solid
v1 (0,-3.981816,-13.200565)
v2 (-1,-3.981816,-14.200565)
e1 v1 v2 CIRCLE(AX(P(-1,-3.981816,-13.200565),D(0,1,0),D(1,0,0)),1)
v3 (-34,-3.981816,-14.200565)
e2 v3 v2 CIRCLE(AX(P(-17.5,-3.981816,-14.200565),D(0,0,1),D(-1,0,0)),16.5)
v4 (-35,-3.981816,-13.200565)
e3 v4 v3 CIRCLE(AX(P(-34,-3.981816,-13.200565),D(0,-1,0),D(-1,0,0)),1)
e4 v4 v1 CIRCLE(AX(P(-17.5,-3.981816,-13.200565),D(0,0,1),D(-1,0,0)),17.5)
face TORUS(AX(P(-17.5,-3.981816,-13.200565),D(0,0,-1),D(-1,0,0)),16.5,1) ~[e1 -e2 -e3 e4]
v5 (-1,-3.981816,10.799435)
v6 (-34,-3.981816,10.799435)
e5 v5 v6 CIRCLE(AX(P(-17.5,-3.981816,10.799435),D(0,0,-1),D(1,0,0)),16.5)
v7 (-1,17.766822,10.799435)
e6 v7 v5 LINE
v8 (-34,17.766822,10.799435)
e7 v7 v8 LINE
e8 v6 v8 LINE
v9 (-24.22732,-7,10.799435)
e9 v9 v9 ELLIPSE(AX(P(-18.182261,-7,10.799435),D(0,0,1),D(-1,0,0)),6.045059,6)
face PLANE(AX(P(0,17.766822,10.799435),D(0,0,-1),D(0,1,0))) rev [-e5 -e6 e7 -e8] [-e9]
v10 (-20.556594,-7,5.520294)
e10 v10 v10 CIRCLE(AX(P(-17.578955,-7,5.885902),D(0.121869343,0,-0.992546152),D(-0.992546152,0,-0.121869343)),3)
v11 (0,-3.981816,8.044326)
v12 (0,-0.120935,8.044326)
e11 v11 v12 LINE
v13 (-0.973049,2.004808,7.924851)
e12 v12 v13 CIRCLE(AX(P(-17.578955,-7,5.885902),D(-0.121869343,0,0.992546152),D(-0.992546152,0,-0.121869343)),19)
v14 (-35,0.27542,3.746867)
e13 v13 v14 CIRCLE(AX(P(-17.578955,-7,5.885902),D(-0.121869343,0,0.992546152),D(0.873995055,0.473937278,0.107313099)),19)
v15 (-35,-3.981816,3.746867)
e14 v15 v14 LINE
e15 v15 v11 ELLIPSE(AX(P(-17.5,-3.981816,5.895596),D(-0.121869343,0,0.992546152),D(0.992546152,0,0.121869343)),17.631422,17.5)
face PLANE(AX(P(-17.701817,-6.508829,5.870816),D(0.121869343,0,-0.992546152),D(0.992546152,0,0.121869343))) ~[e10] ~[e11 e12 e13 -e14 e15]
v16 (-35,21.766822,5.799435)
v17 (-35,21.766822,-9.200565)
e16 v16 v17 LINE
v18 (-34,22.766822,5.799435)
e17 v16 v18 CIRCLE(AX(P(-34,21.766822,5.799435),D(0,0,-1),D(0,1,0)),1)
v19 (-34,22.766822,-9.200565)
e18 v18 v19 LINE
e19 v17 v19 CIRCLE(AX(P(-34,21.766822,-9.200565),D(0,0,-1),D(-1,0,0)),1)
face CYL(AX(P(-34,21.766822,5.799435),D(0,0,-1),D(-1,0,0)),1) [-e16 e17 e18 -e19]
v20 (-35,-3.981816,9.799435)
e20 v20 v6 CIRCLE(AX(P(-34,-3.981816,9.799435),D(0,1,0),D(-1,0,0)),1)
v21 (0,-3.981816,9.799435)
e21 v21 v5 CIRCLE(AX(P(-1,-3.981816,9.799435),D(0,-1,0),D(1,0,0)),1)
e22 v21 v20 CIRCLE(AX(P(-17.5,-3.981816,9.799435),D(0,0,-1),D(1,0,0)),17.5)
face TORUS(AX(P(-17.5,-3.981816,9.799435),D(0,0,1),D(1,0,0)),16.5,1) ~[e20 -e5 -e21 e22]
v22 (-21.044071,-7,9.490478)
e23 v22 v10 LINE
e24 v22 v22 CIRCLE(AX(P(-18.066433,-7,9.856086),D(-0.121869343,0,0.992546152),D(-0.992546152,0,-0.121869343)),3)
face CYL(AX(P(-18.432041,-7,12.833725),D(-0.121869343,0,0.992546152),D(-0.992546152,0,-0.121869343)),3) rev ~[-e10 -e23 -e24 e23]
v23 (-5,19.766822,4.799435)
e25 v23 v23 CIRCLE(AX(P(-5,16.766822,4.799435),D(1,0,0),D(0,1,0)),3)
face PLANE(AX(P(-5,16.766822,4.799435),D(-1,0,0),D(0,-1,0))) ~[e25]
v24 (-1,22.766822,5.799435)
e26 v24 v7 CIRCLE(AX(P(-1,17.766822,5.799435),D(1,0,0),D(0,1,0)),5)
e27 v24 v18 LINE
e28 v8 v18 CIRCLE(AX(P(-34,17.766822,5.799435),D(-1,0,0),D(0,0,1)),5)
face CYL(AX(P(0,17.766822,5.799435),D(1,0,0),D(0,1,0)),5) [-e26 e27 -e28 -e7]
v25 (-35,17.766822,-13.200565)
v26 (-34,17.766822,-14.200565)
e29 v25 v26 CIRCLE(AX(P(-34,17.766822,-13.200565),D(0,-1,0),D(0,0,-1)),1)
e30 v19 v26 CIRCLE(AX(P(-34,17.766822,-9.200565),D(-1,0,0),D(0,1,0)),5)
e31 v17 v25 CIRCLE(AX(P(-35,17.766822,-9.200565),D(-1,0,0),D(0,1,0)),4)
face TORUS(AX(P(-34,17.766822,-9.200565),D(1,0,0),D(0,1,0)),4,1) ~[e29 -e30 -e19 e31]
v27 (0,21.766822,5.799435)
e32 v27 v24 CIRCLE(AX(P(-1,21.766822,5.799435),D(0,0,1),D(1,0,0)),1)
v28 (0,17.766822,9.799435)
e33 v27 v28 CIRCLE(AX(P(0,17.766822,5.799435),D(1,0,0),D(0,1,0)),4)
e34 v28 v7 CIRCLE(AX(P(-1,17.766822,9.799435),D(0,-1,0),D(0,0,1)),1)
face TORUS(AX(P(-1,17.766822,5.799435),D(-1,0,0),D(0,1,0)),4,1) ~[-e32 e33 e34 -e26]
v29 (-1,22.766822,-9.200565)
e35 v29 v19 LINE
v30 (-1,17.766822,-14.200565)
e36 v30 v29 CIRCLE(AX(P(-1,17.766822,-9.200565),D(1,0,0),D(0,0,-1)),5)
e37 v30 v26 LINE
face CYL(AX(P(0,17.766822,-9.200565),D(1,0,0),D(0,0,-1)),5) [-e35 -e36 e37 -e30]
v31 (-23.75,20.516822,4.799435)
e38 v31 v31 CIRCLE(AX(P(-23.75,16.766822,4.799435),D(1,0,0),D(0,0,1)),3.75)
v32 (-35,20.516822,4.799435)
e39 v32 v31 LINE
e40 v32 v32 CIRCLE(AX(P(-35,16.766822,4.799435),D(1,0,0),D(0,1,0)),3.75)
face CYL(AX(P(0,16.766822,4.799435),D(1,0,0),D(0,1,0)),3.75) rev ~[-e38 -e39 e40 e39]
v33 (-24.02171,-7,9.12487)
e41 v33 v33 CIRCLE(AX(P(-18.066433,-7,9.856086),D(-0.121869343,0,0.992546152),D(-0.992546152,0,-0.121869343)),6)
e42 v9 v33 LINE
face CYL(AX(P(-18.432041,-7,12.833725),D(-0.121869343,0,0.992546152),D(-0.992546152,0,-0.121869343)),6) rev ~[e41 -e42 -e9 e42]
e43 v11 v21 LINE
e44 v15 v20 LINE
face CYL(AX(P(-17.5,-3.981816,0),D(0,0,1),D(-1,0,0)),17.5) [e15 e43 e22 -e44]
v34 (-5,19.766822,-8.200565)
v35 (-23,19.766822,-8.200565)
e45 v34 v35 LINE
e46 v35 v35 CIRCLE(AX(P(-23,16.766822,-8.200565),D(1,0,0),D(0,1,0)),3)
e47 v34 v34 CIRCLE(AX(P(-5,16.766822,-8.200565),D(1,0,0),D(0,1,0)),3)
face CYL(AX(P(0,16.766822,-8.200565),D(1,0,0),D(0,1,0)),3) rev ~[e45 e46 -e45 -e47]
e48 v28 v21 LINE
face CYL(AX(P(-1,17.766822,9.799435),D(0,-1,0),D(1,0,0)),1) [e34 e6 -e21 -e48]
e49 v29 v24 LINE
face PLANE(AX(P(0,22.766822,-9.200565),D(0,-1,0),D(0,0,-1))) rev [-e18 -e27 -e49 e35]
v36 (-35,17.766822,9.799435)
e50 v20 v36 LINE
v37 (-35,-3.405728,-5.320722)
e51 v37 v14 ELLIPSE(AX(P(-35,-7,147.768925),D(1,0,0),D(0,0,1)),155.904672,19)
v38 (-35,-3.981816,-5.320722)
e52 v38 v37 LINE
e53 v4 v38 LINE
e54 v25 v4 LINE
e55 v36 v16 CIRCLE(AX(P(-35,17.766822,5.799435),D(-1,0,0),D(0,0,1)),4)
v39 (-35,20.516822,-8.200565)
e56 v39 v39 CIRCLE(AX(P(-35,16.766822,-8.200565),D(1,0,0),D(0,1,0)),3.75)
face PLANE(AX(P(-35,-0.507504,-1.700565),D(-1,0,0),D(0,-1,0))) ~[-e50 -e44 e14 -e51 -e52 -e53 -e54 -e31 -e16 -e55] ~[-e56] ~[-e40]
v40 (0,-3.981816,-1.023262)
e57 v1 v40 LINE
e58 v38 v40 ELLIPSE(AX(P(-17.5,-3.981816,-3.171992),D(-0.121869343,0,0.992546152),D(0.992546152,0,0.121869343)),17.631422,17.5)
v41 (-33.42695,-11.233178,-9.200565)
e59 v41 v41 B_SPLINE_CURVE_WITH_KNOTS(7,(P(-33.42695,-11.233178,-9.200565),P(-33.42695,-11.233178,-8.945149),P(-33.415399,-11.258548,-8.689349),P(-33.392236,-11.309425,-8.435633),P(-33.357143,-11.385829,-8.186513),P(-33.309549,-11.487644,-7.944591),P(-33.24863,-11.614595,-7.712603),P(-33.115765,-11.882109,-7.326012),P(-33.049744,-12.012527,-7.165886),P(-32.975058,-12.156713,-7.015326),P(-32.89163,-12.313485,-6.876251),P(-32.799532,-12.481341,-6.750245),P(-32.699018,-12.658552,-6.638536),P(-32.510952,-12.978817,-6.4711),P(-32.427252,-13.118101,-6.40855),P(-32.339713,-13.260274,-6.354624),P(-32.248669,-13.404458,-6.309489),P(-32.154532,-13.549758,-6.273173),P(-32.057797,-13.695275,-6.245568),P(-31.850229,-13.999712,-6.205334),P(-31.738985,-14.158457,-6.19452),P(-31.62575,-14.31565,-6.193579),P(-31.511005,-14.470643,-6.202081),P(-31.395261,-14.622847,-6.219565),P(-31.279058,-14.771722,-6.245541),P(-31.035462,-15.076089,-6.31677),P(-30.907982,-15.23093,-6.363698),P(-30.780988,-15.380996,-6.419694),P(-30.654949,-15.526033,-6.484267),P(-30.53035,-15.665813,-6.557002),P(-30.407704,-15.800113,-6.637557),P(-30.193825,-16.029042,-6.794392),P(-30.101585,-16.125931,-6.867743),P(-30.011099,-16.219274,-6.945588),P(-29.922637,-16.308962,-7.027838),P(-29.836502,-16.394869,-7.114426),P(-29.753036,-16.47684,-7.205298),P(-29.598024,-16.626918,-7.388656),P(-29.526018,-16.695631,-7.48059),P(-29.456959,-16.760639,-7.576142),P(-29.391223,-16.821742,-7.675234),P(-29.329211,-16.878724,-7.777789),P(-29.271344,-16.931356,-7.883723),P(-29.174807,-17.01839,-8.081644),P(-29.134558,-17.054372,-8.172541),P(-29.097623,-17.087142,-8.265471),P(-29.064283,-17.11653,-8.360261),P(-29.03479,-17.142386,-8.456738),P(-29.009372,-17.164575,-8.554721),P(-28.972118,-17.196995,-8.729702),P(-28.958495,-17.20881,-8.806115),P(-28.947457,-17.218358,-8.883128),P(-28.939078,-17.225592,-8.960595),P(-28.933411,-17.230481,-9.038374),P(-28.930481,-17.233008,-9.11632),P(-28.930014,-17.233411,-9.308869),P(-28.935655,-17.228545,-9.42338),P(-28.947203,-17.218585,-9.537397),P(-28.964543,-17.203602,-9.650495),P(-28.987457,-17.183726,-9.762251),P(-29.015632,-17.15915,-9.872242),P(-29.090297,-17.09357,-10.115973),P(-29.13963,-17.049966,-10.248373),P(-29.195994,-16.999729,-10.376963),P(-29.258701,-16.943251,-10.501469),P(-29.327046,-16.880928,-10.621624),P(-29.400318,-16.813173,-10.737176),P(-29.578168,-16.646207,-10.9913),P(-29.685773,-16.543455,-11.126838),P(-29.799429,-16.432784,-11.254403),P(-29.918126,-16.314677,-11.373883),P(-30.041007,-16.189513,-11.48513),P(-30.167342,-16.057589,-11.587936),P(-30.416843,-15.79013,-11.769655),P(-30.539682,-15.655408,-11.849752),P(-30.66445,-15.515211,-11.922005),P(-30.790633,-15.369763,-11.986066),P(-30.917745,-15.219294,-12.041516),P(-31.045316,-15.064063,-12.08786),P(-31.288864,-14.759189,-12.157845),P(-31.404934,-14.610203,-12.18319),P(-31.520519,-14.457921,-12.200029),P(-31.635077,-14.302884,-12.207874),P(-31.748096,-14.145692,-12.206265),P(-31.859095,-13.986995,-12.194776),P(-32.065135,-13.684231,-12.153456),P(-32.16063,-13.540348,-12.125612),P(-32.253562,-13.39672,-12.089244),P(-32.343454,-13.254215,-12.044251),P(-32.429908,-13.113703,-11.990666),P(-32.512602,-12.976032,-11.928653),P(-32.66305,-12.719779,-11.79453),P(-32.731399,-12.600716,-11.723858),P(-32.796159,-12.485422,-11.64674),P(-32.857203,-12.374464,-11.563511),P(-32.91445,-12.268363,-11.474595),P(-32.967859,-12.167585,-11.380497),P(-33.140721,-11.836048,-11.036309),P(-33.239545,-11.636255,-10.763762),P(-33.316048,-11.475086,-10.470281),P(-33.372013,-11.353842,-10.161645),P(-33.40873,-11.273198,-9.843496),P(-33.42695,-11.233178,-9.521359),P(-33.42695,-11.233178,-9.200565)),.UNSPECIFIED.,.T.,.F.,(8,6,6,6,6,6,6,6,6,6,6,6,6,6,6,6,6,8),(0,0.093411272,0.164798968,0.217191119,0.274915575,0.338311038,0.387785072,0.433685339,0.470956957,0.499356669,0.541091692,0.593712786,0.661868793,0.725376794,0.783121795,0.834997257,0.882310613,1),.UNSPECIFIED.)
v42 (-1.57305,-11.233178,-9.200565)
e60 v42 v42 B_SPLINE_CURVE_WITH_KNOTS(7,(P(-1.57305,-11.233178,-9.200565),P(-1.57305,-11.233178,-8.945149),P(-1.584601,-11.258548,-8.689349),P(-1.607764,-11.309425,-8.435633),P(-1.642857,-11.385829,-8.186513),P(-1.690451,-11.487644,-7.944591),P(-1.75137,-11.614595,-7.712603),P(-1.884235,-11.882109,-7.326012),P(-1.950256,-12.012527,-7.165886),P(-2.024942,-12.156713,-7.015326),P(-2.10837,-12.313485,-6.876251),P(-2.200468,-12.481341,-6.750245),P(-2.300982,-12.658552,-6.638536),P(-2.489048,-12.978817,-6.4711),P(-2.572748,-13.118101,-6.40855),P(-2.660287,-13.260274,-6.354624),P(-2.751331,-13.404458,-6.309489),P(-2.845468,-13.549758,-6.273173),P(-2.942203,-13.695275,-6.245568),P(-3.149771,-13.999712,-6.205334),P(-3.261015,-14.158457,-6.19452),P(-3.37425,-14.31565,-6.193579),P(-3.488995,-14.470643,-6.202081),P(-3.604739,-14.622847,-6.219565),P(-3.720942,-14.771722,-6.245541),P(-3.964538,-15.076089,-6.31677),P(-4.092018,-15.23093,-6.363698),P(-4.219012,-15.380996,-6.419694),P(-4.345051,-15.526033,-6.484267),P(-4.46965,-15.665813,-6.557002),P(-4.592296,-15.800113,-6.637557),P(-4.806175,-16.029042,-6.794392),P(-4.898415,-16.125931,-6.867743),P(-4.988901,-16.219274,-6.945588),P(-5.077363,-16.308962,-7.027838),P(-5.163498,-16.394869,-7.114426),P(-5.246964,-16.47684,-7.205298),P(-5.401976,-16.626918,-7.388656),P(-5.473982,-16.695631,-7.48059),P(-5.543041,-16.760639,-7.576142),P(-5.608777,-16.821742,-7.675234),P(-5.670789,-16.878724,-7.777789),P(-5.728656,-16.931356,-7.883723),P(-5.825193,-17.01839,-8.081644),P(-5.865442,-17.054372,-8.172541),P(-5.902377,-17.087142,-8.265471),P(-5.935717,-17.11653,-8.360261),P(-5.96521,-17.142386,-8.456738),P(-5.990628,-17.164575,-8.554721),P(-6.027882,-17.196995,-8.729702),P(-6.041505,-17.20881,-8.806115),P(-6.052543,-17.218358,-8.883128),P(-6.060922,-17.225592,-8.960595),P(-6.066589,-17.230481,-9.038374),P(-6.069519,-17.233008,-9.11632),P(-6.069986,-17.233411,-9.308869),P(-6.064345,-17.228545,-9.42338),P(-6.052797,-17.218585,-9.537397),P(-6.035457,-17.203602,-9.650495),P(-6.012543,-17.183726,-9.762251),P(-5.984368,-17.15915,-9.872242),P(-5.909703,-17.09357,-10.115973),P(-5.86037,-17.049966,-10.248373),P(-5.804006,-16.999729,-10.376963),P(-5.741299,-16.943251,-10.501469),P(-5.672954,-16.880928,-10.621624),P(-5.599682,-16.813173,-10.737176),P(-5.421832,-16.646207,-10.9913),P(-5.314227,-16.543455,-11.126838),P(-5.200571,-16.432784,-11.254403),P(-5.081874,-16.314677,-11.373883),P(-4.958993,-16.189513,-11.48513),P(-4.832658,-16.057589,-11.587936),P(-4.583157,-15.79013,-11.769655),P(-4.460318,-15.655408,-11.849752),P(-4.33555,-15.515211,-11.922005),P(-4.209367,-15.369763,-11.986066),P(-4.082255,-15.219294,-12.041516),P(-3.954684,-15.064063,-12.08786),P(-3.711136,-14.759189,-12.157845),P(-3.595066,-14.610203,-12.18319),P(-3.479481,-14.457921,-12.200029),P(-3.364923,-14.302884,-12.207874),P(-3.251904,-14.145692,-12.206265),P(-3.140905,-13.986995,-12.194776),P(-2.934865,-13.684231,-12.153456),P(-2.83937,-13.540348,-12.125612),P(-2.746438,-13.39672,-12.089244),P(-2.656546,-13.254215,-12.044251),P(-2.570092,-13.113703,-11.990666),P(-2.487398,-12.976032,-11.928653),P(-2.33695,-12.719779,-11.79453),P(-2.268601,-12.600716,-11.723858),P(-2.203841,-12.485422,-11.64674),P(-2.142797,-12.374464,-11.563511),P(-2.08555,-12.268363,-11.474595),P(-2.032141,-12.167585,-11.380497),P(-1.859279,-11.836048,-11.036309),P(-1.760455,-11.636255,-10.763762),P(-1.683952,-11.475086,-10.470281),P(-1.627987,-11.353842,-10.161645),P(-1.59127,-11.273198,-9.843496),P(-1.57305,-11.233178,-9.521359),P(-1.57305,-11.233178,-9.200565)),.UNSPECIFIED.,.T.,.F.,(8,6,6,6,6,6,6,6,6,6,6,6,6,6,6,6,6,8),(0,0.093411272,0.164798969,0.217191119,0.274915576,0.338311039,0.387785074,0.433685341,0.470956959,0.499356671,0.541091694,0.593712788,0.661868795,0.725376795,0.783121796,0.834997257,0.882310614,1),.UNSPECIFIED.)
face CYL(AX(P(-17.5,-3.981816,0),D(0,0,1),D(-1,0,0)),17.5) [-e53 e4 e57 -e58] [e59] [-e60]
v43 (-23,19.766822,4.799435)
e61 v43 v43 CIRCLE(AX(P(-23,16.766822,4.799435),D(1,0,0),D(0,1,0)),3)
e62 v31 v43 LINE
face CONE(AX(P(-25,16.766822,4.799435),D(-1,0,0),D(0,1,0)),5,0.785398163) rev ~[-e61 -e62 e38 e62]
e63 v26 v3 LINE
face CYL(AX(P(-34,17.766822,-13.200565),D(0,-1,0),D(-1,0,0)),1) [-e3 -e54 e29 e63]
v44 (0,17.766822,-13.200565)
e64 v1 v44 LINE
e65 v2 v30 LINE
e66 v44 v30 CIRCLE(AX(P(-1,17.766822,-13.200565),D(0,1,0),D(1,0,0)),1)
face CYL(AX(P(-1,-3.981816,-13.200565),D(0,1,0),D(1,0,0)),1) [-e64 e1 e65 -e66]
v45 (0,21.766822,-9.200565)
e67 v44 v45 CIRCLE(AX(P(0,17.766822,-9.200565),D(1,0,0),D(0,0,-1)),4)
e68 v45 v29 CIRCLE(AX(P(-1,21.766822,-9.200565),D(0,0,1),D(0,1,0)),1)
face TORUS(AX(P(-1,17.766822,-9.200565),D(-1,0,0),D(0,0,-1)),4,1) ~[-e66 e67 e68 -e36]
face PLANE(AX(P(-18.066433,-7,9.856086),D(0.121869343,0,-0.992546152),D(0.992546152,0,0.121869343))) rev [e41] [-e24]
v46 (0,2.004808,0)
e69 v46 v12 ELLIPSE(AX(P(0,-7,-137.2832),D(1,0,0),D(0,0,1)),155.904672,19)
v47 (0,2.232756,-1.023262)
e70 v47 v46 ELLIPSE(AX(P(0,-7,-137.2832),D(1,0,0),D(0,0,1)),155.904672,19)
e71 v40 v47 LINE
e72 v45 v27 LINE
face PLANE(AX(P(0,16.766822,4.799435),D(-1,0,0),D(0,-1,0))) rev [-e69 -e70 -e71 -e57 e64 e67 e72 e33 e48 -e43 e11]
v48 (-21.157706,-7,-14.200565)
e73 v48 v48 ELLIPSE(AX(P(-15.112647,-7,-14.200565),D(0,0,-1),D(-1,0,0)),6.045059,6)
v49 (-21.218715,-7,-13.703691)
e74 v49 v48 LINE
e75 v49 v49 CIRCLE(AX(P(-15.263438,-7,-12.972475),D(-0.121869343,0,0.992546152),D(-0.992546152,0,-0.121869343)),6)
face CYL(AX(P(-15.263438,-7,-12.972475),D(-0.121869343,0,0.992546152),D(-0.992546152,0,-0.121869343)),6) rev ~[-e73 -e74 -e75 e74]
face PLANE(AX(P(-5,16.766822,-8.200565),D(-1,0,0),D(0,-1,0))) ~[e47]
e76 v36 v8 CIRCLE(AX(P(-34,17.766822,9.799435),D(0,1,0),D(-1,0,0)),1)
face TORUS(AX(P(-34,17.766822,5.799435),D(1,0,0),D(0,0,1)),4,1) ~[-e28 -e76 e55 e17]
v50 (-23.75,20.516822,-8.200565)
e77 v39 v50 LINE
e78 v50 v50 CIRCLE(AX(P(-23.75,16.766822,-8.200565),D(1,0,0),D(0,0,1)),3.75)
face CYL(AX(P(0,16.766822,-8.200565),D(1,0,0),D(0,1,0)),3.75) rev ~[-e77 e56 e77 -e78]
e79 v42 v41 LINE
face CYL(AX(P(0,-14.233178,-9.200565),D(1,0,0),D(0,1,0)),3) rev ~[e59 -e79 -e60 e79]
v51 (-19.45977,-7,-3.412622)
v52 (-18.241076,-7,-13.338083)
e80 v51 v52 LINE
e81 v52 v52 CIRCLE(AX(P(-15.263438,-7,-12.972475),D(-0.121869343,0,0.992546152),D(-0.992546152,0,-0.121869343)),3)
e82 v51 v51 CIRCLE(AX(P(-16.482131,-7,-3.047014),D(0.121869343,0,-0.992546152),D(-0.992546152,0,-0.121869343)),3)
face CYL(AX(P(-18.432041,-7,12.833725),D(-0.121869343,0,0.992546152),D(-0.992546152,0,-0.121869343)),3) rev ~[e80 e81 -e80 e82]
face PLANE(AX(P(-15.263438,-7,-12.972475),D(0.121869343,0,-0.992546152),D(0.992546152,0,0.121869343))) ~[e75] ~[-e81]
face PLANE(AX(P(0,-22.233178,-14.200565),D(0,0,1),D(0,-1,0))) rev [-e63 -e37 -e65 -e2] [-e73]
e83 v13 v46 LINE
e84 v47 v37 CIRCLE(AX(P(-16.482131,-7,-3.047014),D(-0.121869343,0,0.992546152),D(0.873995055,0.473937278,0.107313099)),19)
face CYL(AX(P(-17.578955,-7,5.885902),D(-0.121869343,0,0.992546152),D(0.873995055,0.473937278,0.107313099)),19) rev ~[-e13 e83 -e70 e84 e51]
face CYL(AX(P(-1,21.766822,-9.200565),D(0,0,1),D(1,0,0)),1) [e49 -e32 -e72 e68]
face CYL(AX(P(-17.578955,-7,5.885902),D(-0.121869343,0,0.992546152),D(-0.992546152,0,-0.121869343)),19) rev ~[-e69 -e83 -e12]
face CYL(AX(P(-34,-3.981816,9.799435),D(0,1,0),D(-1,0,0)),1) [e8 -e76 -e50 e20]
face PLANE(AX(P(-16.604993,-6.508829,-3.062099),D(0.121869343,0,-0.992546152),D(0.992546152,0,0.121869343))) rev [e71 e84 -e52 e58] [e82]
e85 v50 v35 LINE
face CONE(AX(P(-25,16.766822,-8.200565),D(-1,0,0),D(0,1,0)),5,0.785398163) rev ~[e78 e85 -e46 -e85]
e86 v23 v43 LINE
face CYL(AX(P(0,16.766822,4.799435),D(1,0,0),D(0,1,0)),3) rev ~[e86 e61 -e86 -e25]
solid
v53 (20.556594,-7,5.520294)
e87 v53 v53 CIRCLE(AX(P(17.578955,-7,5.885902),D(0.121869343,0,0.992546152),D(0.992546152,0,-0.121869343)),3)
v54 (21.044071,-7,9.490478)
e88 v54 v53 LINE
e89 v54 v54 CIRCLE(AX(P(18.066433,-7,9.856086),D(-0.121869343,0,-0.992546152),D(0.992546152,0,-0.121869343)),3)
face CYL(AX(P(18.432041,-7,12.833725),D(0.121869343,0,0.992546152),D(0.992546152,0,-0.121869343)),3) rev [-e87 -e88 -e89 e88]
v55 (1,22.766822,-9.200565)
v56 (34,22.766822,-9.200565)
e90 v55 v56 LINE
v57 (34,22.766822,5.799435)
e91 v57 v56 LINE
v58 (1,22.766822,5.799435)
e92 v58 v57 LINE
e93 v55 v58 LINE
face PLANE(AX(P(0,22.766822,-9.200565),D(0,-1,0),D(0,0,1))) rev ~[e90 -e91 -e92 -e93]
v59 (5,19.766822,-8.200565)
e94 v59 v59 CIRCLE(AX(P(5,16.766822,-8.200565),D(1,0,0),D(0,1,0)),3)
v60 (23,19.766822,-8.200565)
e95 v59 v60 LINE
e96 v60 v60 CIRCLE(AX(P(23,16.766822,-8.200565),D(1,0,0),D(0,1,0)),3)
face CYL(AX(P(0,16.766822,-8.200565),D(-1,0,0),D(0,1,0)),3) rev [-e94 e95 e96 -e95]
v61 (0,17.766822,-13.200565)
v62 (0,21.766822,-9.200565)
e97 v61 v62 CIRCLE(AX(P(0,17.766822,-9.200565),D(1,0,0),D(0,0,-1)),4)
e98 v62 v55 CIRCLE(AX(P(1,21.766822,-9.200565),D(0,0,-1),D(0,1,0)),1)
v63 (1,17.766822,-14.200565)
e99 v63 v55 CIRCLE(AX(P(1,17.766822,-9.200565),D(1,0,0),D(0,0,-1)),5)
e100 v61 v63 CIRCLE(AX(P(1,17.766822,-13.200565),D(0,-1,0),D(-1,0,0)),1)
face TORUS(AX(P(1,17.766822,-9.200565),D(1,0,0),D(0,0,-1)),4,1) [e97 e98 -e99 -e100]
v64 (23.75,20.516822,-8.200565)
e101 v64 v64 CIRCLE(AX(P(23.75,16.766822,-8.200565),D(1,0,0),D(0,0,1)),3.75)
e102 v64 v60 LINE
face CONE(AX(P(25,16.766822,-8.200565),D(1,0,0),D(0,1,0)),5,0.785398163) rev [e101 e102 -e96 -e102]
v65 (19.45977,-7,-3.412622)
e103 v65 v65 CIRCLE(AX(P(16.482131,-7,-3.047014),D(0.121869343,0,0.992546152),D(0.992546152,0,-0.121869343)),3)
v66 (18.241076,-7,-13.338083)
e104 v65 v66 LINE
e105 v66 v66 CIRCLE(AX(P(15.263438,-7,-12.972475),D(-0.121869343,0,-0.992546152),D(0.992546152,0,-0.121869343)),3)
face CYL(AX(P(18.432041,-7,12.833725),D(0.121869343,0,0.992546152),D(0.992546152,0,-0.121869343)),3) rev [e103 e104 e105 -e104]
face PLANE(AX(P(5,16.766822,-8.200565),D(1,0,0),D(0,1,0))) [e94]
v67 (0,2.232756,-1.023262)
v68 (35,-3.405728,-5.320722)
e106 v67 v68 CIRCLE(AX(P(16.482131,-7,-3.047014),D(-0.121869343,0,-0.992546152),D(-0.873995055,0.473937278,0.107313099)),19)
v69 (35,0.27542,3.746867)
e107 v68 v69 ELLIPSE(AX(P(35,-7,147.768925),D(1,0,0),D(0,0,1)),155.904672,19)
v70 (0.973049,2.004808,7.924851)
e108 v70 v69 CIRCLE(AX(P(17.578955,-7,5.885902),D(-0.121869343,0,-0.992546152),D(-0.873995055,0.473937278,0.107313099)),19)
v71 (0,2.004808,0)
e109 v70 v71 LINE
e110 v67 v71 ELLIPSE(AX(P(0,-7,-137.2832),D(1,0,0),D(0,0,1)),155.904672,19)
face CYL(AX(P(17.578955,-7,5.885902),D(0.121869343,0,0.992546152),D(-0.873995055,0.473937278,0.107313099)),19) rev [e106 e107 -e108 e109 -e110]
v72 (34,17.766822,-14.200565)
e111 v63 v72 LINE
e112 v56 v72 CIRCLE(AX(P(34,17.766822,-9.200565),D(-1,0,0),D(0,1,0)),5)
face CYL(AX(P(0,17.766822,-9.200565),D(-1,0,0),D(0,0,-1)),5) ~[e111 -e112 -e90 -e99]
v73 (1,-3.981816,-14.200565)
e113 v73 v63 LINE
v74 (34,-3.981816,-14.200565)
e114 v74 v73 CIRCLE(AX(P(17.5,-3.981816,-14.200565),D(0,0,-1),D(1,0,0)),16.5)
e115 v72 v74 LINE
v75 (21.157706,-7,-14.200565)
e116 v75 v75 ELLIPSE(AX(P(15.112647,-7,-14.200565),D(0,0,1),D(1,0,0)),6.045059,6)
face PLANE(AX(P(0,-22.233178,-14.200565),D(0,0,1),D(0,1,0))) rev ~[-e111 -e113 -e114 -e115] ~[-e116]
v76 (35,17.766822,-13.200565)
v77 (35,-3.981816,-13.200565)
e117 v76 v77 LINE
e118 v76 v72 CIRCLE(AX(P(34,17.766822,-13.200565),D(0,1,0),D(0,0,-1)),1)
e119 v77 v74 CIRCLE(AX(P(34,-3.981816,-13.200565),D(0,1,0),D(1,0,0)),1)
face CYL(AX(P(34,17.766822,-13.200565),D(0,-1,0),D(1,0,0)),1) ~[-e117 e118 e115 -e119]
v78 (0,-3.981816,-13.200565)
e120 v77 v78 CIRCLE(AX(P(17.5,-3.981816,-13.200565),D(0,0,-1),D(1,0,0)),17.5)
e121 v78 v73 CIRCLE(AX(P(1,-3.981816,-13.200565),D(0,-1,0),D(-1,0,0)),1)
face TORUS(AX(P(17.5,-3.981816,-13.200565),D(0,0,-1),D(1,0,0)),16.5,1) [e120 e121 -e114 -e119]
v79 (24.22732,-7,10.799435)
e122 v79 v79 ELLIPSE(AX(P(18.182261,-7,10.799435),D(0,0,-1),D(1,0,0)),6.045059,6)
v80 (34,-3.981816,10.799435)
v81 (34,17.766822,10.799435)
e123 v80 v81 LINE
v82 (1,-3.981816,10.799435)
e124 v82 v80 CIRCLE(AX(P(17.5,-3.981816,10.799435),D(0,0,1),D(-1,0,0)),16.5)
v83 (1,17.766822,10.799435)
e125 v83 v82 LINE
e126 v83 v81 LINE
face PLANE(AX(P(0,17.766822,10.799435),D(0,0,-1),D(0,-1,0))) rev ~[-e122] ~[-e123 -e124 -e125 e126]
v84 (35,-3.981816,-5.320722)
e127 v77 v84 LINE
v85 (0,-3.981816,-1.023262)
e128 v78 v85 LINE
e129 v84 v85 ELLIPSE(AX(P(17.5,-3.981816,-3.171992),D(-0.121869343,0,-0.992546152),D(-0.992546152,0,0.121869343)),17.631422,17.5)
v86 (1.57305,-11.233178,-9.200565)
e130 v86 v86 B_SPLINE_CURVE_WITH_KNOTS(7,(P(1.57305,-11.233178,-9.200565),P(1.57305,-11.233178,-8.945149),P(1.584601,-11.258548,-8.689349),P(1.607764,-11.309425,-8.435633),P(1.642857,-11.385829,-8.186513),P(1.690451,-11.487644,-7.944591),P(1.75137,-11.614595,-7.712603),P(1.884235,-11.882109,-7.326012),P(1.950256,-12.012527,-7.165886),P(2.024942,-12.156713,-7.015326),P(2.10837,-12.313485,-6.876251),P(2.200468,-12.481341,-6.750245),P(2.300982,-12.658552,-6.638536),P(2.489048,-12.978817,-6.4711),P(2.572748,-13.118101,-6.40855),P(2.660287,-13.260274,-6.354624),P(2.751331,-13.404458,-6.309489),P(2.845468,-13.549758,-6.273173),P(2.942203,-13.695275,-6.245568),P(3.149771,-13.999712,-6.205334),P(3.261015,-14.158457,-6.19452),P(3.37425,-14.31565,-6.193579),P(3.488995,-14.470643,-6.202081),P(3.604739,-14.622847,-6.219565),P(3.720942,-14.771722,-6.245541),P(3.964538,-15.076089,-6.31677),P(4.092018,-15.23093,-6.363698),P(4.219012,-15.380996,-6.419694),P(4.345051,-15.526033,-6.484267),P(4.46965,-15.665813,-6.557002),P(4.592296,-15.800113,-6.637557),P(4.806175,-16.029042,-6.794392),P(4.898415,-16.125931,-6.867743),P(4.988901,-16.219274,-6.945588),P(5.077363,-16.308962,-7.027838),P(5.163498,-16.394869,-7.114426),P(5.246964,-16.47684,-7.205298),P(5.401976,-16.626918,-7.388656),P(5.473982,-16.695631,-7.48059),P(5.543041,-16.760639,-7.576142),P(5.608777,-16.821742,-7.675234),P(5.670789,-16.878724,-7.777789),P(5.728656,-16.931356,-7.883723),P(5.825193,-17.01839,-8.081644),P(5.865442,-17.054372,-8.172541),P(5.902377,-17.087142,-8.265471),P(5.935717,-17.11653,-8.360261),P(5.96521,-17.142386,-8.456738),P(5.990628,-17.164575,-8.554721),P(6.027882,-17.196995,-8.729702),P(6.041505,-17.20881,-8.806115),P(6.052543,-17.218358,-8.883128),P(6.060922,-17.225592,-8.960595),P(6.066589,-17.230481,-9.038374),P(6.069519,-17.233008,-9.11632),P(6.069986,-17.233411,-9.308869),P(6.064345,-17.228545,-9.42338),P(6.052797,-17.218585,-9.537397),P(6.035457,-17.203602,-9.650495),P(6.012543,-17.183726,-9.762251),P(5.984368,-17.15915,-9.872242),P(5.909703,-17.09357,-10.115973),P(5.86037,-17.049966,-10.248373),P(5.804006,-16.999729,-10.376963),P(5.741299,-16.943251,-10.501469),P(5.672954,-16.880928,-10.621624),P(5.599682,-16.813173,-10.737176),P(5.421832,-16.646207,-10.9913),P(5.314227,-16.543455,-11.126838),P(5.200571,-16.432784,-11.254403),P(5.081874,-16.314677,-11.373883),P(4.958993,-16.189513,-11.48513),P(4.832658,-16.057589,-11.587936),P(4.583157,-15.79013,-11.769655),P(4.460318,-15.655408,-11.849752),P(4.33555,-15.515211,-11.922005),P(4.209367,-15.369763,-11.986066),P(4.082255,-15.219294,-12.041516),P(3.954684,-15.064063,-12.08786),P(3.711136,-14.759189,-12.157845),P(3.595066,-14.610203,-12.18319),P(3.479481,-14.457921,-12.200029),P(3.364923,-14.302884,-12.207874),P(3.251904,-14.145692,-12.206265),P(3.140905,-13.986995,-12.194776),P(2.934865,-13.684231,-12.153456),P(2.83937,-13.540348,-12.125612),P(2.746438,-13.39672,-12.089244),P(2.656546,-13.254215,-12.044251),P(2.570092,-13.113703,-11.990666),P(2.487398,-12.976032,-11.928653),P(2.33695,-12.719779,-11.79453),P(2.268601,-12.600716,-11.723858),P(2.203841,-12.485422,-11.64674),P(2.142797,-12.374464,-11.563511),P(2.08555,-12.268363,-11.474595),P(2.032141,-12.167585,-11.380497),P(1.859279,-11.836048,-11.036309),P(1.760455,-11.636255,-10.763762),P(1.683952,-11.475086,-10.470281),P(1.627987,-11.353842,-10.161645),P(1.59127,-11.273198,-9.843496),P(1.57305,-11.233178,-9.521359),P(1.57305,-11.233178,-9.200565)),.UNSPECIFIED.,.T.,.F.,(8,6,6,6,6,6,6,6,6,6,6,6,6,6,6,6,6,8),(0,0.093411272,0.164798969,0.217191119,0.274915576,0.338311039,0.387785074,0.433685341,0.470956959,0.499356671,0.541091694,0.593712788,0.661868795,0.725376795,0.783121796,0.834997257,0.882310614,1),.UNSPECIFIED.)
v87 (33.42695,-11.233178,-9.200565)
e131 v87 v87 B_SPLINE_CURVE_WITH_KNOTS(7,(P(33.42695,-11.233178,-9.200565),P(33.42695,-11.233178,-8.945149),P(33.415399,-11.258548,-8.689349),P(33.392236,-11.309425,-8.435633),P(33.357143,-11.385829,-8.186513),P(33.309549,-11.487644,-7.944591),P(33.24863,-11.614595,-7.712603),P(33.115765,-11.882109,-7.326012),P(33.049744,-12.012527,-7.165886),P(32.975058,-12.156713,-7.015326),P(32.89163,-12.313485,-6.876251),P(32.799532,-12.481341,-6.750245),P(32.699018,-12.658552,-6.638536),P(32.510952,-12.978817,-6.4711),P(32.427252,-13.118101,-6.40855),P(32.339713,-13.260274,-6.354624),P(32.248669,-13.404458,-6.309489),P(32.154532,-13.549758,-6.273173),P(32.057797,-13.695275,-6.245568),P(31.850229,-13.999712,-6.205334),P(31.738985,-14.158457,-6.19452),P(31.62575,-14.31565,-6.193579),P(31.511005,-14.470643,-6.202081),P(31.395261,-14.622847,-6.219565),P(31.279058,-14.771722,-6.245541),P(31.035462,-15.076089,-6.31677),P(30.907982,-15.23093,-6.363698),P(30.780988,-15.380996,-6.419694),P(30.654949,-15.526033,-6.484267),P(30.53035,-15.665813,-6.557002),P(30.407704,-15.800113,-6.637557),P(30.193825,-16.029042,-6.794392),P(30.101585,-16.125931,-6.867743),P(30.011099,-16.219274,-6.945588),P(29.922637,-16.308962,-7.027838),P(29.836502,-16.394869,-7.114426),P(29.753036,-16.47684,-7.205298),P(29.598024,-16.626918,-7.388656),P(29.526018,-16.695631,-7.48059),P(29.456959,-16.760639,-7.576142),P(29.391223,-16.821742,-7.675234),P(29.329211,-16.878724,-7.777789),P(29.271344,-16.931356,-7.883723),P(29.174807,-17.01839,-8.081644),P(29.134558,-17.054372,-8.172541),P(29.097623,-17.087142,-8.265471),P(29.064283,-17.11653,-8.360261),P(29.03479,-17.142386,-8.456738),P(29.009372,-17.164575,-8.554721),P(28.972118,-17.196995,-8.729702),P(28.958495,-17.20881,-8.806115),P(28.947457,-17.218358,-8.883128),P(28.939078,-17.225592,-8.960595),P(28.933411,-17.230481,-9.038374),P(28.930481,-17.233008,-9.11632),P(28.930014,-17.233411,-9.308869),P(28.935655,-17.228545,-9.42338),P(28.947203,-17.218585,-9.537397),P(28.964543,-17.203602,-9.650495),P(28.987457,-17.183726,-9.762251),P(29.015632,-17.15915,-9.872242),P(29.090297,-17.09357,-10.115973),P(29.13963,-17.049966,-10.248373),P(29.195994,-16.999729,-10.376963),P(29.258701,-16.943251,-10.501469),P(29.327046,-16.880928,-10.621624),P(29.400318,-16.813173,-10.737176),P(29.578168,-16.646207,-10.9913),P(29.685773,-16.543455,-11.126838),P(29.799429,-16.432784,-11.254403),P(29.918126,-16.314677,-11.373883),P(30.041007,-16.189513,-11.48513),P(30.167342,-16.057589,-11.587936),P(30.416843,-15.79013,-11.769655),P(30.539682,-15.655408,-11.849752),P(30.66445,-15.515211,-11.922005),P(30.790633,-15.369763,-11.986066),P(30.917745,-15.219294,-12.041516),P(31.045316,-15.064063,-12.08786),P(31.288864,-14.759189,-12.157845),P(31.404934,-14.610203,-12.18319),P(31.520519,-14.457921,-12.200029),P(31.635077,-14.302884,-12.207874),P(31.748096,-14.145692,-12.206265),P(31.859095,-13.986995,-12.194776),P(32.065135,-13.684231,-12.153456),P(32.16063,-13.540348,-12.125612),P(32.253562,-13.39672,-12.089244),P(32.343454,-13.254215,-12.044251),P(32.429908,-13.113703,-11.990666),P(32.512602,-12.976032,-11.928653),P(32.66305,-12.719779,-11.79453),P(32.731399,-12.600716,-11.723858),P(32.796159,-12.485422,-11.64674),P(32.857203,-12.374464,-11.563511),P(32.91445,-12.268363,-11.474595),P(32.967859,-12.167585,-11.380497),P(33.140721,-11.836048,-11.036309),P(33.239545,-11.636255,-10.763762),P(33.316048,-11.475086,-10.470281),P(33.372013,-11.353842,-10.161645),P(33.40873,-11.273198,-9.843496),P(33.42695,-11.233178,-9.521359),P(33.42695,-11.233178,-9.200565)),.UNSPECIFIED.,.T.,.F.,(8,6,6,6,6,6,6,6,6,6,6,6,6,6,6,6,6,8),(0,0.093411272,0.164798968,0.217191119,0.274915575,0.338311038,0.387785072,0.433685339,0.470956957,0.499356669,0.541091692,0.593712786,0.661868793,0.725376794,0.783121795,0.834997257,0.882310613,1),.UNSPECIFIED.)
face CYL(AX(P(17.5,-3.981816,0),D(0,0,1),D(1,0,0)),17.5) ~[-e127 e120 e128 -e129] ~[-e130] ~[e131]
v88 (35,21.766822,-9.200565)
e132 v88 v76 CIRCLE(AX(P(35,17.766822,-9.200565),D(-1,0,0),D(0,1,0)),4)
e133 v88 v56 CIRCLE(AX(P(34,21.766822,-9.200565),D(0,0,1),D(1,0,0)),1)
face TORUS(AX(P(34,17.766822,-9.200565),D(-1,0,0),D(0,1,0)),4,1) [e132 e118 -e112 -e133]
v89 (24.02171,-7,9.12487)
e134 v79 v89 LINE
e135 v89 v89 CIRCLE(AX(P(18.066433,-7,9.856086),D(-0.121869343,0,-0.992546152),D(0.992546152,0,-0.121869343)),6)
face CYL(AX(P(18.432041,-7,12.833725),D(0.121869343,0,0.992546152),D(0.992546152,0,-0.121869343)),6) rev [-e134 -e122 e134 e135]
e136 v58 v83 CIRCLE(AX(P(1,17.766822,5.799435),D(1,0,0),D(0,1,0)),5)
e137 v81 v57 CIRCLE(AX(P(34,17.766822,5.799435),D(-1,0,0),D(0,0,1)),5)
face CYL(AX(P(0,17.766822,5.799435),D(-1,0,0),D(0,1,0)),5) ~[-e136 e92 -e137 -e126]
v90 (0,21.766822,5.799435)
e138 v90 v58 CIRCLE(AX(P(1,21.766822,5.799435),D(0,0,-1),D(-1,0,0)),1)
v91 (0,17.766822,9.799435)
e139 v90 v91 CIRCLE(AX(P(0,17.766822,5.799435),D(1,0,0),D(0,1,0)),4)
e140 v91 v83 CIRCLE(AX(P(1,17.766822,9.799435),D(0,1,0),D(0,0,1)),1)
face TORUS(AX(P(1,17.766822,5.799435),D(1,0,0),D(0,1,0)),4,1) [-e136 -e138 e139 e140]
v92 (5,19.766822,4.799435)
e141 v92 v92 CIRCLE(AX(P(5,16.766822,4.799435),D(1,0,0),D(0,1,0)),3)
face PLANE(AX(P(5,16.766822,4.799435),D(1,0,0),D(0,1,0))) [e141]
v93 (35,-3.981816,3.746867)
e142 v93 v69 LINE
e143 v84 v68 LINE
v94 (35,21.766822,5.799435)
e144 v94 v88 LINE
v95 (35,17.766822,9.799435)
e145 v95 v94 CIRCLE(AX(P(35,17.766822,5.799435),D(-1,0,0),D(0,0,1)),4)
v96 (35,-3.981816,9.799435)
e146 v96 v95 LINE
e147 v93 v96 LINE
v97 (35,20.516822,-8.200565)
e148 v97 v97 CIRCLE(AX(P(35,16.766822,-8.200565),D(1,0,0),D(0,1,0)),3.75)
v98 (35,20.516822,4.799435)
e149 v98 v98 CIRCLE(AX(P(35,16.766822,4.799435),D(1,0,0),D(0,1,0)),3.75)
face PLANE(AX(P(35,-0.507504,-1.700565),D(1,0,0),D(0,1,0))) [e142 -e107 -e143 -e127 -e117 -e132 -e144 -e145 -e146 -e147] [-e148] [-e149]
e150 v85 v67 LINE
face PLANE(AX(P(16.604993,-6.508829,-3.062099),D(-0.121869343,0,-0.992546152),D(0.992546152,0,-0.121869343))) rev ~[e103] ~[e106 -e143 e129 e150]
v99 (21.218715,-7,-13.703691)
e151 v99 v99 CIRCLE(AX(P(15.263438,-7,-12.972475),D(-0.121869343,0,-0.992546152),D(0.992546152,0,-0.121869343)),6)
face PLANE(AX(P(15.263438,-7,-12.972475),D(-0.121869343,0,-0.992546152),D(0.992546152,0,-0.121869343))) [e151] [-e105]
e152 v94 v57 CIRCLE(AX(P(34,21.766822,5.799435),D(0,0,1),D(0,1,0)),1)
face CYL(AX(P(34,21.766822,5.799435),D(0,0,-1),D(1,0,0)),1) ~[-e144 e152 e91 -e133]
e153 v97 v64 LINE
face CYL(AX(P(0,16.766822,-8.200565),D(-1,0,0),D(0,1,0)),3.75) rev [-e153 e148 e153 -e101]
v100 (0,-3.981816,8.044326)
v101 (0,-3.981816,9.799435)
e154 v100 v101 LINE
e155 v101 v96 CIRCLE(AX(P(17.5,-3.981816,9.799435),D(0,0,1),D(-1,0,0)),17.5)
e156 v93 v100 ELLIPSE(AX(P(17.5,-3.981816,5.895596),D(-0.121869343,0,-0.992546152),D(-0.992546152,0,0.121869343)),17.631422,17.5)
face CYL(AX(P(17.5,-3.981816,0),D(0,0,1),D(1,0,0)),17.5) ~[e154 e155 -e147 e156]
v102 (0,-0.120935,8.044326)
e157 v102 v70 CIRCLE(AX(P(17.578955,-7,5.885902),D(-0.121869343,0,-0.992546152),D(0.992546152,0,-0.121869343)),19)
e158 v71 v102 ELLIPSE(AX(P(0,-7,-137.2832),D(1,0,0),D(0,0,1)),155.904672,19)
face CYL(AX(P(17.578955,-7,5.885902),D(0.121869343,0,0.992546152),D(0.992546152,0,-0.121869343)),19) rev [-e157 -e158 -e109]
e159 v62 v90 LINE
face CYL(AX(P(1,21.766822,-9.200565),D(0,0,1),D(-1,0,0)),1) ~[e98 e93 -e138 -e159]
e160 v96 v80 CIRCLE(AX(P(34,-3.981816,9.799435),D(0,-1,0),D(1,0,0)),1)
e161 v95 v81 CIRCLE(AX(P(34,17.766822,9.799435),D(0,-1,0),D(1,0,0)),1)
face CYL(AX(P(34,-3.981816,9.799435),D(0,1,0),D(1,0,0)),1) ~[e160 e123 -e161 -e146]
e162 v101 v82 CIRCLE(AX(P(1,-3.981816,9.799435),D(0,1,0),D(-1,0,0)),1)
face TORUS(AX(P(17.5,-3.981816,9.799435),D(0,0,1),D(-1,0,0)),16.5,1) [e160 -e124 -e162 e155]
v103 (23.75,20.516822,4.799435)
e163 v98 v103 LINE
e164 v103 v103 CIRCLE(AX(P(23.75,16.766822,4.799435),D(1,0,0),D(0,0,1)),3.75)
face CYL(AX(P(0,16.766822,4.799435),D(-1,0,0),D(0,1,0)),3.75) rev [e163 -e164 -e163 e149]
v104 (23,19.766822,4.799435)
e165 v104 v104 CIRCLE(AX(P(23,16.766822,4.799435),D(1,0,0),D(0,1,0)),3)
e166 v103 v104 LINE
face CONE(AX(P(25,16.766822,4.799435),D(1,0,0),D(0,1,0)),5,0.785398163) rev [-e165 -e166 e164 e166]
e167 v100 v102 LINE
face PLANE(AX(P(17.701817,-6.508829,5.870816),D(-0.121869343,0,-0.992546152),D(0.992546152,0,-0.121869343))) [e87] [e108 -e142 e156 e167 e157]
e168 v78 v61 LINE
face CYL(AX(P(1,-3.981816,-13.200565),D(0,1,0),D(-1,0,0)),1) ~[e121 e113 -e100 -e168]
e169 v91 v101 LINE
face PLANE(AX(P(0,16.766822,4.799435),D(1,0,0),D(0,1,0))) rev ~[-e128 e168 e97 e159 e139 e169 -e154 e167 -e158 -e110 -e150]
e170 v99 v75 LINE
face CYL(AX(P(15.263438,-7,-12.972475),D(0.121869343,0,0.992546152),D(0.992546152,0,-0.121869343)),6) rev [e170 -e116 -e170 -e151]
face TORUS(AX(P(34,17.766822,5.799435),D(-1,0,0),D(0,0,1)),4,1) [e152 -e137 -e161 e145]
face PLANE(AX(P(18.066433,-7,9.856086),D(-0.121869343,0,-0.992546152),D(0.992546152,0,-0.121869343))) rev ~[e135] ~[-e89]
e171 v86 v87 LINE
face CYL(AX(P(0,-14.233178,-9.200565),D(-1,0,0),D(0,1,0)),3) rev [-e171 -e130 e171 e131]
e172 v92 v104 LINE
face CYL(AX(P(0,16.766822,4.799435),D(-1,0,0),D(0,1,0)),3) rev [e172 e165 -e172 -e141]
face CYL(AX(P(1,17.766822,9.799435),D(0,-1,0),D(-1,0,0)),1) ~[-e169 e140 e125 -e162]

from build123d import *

# Parameters (mm, degrees)
F0_R          = 3
F0_R_2        = 3.75
F1_DEPTH      = 35
F2_DEPTH      = 25
F5_DEPTH      = 25
F5_DEPTH_BACK = 25
F6_DEPTH      = 5
F8_START      = 7
F7_R          = 6
F7_R_2        = 3
F8_DEPTH      = 9
F9_R          = 1
F10_S5_R      = 3.75
F10_T6_DEPTH  = 9
F10_S11_R     = 3.75
F10_T12_DEPTH = 9
F11_DEPTH     = 29.0800808224
F12_DEPTH     = 3
F13_START     = 26
F13_DEPTH     = 14


# Not quite as in the source:
# - a fillet or chamfer that OpenCascade refuses, or shapes differently, is made with other operations: its cross-section is extruded or revolved along the edge and cut away or added


with BuildPart() as f1:
    # F0 (on Right) → F1 (new body)
    with BuildSketch(Plane.YZ):
        with BuildLine():
            Line((17.766822055, 10.7994352999), (-22.233177945, 10.7994352999))
            Line((-22.233177945, 10.7994352999), (-22.233177945, -14.2005647001))
            Line((-22.233177945, -14.2005647001), (17.766822055, -14.2005647001))
            ThreePointArc((17.766822055, -14.2005647001), (21.3023559609, -12.7360986061), (22.766822055, -9.2005647001))
            Line((22.766822055, -9.2005647001), (22.766822055, 5.7994352999))
            ThreePointArc((22.766822055, 5.7994352999), (21.3023559609, 9.3349692058), (17.766822055, 10.7994352999))
        make_face()
        with Locations((-14.233177945, -9.2005647001)):
            Circle(F0_R, mode=Mode.SUBTRACT)
        with Locations((16.766822055, -8.2005647001)):
            Circle(F0_R_2, mode=Mode.SUBTRACT)
        with Locations((16.766822055, 4.7994352999)):
            Circle(F0_R_2, mode=Mode.SUBTRACT)
    extrude(amount=F1_DEPTH)

    # F0 (on Right) → F2 (join)
    with BuildSketch(Plane.YZ):
        with Locations((16.766822055, 4.7994352999)):
            Circle(F0_R_2)
        with Locations((16.766822055, 4.7994352999)):
            Circle(F0_R, mode=Mode.SUBTRACT)
        with Locations((16.766822055, -8.2005647001)):
            Circle(F0_R_2)
        with Locations((16.766822055, -8.2005647001)):
            Circle(F0_R, mode=Mode.SUBTRACT)
    extrude(amount=F2_DEPTH)

    # F3 (on Top) → F5 (cut, two sides)
    with BuildSketch(Plane.XY) as f5_sk:
        with BuildLine():
            Line((35, -26.8306802252), (35, -3.9818156511))
            ThreePointArc((35, -3.9818156511), (17.5, -21.4818156511), (0, -3.9818156511))
            Line((0, -3.9818156511), (0, -26.8306802252))
            Line((0, -26.8306802252), (35, -26.8306802252))
        make_face()
    extrude(amount=-F5_DEPTH, mode=Mode.SUBTRACT)
    extrude(f5_sk.sketch, amount=F5_DEPTH_BACK, mode=Mode.SUBTRACT)

    # F0 (on Right) → F6 (join)
    with BuildSketch(Plane.YZ):
        with Locations((16.766822055, 4.7994352999)):
            Circle(F0_R)
        with Locations((16.766822055, -8.2005647001)):
            Circle(F0_R)
    extrude(amount=F6_DEPTH)

    # F7 (on face) → F8 (cut)
    with BuildSketch(Plane(origin=(1.8261347197, 0, 14.8726737817), x_dir=(0.9925461516, 0, -0.1218693434), z_dir=(-0.1218693434, 0, -0.9925461516)).offset(F8_START)):
        with BuildLine():
            ThreePointArc((0, -2.0048082738), (21.3737990176, -11.4239200012), (35.730613496, 7))
            ThreePointArc((35.730613496, 7), (12.0874279744, 25.4239200012), (0, -2.0048082738))
        make_face()
        with Locations((16.730613496, 7)):
            Circle(F7_R, mode=Mode.SUBTRACT)
        with Locations((16.730613496, 7)):
            Circle(F7_R)
        with Locations((16.730613496, 7)):
            Circle(F7_R_2, mode=Mode.SUBTRACT)
        with Locations((16.730613496, 7)):
            Circle(F7_R_2)
    extrude(amount=F8_DEPTH, mode=Mode.SUBTRACT)

    # F9
    f9_edges = [f1.edges().sort_by_distance(p)[0] for p in [
        (0, 6.892503, -14.200565),
        (35, 6.892503, -14.200565),
        (0, 21.302356, -12.736099),
        (35, 21.302356, -12.736099),
        (35, 22.766822, -1.700565),
        (35, 21.302356, 9.334969),
        (35, 6.892503, 10.799435),
        (0, 6.892503, 10.799435),
        (0, 21.302356, 9.334969),
        (0, 22.766822, -1.700565),
        (17.5, -21.481816, 10.799435),
        (17.5, -21.481816, -14.200565),
    ]]
    fillet(f9_edges, radius=F9_R)

    # F10: chamfer of 2 on 2 edges, made by hand


with BuildPart() as f10_tool2:
    # F10_s3 → F10_t4 (revolve)
    with BuildSketch(Plane.XY.offset(4.7994352999)):
        Polygon((25, 21.766822055), (23, 19.766822055), (25, 19.766822055), align=None)
    revolve(axis=Axis((25, 16.766822055, 4.7994352999), (1, 0, 0)))

    # F10_s5 → F10_t6 (intersect, symmetric)
    with BuildSketch(Plane.YZ.offset(24)):
        with Locations((16.766822055, 4.7994352999)):
            Circle(F10_S5_R)
    extrude(amount=F10_T6_DEPTH, both=True, mode=Mode.INTERSECT)


with BuildPart() as f1_1:
    add(f1.part)

    # F10_t1: cut F10_tool2
    add(f10_tool2.part, mode=Mode.SUBTRACT)


with BuildPart() as f10_tool8:
    # F10_s9 → F10_t10 (revolve)
    with BuildSketch(Plane.XY.offset(-8.2005647001)):
        Polygon((25, 21.766822055), (23, 19.766822055), (25, 19.766822055), align=None)
    revolve(axis=Axis((25, 16.766822055, -8.2005647001), (1, 0, 0)))

    # F10_s11 → F10_t12 (intersect, symmetric)
    with BuildSketch(Plane.YZ.offset(24)):
        with Locations((16.766822055, -8.2005647001)):
            Circle(F10_S11_R)
    extrude(amount=F10_T12_DEPTH, both=True, mode=Mode.INTERSECT)


with BuildPart() as f1_2:
    add(f1_1.part)

    # F10_t7: cut F10_tool8
    add(f10_tool8.part, mode=Mode.SUBTRACT)

    # F7 (on face) → F11 (cut, through all)
    with BuildSketch(Plane(origin=(1.8261347197, 0, 14.8726737817), x_dir=(0.9925461516, 0, -0.1218693434), z_dir=(-0.1218693434, 0, -0.9925461516))):
        with Locations((16.730613496, 7)):
            Circle(F7_R_2)
    extrude(amount=F11_DEPTH, mode=Mode.SUBTRACT)

    # F7 (on face) → F12 (cut)
    with BuildSketch(Plane(origin=(1.8261347197, 0, 14.8726737817), x_dir=(0.9925461516, 0, -0.1218693434), z_dir=(-0.1218693434, 0, -0.9925461516))):
        with Locations((16.730613496, 7)):
            Circle(F7_R)
        with Locations((16.730613496, 7)):
            Circle(F7_R_2, mode=Mode.SUBTRACT)
    extrude(amount=F12_DEPTH, mode=Mode.SUBTRACT)

    # F7 (on face) → F13 (cut)
    with BuildSketch(Plane(origin=(1.8261347197, 0, 14.8726737817), x_dir=(0.9925461516, 0, -0.1218693434), z_dir=(-0.1218693434, 0, -0.9925461516)).offset(F13_START)):
        with Locations((16.730613496, 7)):
            Circle(F7_R)
        with Locations((16.730613496, 7)):
            Circle(F7_R_2, mode=Mode.SUBTRACT)
    extrude(amount=F13_DEPTH, mode=Mode.SUBTRACT)


with BuildPart() as f14_1:
    # F14: instance of F1
    add(f1_2.part.mirror(Plane.YZ))


solid = Compound([f1_2.part, f14_1.part])
